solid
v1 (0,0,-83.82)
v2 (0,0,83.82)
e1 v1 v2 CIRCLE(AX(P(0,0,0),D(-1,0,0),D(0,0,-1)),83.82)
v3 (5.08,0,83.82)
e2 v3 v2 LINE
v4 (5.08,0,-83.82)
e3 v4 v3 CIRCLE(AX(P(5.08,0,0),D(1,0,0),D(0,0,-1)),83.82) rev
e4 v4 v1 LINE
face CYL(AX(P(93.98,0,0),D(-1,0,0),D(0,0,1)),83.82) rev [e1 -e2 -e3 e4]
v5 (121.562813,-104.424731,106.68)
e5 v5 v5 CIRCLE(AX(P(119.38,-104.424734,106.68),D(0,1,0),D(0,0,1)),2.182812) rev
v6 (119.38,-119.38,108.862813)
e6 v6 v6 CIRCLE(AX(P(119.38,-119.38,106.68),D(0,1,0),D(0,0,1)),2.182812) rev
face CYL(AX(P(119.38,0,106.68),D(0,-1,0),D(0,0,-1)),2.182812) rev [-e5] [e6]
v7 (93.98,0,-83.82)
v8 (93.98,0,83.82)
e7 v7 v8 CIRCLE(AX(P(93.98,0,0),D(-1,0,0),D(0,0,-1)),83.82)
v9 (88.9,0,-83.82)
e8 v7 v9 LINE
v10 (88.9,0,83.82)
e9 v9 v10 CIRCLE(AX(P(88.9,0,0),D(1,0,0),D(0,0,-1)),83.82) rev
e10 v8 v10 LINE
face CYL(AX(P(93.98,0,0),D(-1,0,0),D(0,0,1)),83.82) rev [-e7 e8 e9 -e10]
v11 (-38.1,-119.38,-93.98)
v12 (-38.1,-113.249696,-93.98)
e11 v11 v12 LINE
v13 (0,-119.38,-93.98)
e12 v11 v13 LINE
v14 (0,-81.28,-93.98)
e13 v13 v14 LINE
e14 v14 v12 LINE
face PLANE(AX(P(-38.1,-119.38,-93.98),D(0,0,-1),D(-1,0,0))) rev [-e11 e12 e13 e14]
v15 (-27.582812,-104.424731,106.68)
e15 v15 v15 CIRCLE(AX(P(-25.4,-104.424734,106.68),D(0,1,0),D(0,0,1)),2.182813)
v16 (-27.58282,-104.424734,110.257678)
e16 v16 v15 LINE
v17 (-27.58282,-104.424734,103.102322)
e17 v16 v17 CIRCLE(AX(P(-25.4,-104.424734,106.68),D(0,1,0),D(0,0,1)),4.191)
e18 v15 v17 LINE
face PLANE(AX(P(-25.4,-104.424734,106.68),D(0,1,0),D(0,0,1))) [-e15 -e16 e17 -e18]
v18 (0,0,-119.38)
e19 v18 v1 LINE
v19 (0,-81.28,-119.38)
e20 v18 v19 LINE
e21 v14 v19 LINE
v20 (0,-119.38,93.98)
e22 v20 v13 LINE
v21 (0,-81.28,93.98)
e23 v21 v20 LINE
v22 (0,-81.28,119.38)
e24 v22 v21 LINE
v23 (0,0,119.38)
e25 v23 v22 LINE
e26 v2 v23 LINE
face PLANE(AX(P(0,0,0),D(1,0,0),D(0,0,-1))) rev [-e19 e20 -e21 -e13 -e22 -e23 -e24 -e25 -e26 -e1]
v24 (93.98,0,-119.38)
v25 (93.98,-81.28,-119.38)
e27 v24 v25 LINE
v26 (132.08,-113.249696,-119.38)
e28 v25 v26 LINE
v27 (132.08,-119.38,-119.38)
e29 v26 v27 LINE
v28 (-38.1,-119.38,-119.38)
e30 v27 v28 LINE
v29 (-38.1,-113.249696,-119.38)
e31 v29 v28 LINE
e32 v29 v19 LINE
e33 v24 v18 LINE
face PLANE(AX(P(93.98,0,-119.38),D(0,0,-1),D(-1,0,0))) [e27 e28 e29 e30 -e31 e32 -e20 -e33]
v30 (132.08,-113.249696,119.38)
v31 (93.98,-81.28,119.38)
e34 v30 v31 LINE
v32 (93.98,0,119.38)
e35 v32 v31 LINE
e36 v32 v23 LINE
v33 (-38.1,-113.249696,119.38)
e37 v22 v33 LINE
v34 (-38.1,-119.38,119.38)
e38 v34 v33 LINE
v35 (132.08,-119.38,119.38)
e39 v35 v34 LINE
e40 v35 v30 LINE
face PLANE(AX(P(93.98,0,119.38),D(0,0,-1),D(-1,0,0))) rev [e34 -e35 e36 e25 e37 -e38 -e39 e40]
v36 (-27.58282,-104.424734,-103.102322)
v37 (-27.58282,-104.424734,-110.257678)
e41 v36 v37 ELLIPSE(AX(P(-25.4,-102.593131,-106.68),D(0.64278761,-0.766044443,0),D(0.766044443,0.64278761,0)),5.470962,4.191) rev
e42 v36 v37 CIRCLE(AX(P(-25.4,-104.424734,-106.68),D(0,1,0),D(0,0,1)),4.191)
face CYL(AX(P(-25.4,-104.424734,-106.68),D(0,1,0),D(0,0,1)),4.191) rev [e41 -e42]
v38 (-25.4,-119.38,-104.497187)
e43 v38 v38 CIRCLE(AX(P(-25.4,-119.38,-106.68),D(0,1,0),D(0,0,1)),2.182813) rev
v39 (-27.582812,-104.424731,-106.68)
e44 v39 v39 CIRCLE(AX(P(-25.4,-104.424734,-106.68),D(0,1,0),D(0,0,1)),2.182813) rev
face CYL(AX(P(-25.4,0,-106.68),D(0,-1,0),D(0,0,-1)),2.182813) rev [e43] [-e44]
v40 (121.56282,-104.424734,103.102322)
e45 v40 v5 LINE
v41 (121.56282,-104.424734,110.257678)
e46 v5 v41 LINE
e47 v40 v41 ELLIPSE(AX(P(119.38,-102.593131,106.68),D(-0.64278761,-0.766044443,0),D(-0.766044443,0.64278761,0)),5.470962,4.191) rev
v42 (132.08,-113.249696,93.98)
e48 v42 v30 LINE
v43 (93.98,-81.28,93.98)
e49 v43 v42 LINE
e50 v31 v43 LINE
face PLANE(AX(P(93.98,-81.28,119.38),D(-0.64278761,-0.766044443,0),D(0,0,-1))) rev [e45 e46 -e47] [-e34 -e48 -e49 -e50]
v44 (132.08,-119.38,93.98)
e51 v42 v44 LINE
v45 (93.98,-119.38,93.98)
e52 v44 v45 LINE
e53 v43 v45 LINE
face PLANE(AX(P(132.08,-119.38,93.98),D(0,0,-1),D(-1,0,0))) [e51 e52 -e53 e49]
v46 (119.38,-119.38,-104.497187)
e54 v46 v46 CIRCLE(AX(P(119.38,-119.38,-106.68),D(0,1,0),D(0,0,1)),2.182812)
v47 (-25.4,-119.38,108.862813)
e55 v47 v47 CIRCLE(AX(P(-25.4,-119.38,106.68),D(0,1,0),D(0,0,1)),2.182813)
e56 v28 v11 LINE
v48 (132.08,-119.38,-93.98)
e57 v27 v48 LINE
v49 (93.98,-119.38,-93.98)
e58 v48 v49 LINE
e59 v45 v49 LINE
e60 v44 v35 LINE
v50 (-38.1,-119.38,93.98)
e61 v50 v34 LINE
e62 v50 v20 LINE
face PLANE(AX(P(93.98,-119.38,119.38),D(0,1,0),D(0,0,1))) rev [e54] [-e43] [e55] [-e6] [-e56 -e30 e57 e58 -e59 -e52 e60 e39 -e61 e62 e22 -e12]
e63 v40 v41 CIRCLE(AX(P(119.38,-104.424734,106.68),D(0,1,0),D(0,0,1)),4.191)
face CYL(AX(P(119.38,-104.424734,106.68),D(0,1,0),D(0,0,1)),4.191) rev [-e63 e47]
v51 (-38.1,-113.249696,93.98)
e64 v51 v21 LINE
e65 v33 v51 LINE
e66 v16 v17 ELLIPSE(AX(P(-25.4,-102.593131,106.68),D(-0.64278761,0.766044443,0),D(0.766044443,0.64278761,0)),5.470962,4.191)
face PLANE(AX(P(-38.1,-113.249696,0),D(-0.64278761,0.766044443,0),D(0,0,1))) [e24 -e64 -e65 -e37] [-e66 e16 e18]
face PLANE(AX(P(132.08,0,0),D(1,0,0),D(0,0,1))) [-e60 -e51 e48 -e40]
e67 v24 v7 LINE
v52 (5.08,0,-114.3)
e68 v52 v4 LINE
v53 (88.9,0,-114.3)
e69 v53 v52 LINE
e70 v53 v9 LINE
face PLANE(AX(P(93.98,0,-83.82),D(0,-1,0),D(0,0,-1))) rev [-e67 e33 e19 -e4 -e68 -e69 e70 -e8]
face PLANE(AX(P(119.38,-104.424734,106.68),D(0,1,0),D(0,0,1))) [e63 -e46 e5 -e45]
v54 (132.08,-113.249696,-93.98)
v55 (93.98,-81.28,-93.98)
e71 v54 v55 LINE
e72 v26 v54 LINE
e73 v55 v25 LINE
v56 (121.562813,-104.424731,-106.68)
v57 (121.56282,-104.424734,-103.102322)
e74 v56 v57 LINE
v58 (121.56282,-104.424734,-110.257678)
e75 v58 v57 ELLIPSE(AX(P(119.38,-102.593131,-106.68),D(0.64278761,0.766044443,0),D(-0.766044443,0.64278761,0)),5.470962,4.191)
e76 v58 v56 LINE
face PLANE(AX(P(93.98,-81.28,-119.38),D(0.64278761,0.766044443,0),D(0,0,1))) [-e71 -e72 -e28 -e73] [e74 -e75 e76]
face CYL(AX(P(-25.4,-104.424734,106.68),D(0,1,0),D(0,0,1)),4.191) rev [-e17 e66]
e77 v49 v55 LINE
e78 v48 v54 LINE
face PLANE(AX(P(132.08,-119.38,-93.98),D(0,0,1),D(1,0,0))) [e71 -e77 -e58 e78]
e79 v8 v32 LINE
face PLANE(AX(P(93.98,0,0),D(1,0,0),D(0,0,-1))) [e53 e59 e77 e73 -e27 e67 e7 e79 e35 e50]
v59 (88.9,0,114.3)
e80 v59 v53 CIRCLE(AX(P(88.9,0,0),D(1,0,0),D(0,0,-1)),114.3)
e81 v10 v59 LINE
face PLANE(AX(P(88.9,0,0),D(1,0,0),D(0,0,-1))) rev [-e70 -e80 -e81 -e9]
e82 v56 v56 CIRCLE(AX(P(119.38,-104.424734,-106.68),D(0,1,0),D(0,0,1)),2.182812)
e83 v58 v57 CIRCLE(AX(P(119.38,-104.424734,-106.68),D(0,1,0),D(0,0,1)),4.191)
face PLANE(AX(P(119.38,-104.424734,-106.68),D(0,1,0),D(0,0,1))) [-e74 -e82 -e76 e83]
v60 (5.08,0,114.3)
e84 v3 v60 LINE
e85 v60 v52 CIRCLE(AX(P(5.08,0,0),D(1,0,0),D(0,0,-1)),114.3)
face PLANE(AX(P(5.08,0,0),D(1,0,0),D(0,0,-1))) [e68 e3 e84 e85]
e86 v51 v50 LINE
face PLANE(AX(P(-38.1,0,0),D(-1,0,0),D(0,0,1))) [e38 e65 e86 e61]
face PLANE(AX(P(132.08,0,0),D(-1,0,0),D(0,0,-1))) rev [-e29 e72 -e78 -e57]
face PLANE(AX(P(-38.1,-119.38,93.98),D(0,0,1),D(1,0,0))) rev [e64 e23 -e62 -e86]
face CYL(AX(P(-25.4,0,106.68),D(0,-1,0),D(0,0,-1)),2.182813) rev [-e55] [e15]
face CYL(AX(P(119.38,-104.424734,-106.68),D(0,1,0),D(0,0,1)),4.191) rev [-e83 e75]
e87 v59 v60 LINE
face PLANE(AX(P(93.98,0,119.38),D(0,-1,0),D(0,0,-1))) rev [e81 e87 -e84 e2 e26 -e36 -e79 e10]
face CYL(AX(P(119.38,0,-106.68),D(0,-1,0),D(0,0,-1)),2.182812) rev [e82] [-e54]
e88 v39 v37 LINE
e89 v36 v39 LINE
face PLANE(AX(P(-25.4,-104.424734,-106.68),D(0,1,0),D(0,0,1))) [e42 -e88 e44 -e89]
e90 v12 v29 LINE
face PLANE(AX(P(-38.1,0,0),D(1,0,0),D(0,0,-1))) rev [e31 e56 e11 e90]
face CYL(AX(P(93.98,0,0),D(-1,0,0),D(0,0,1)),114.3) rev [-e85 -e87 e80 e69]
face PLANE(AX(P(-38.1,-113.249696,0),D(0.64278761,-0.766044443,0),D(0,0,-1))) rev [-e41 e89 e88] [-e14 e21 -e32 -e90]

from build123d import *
from OCP.BRepFilletAPI import BRepFilletAPI_MakeChamfer

# Parameters (mm, degrees)
BOSS_EXTRUDE1_DEPTH        = 93.98
SHELL2_T                   = -5.08
BOSS_EXTRUDE2_DEPTH        = 93.98
SKETCH9_W                  = 31.75
SKETCH9_H                  = 12.7
BOSS_EXTRUDE3_DEPTH        = 25.4
SKETCH8_R                  = 2.1828125
CUT_EXTRUDE2_DEPTH         = 210.869181158
SKETCH10_W                 = 25.4
SKETCH10_H                 = 38.1
BOSS_EXTRUDE4_DEPTH        = 38.1
CHAMFER1_SIZE              = 38.1
CHAMFER1_SIZE_2            = 31.969695948
CHAMFER1_OF_MIRROR3_SIZE   = 38.1
CHAMFER1_OF_MIRROR3_SIZE_2 = 31.969695948
SKETCH13_R                 = 2.1828125
CUT_EXTRUDE4_DEPTH         = 230.473221096
SKETCH15_W                 = 93.98
SKETCH15_H                 = 25.4
CUT_EXTRUDE5_DEPTH         = 230.473221096
CUT_EXTRUDE6_START         = 40.355266
SKETCH14_R                 = 4.191
CUT_EXTRUDE6_DEPTH         = 25.4


with BuildPart() as part:
    # Sketch1 → Boss-Extrude1 (new body)
    with BuildSketch(Plane(origin=(0, 0, 0), x_dir=(0, 0, -1), z_dir=(1, 0, 0))):
        with BuildLine():
            Line((-119.38, 0), (-83.82, 0))
            ThreePointArc((-83.82, 0), (0, -83.82), (83.82, 0))
            Line((83.82, 0), (119.38, 0))
            ThreePointArc((119.38, 0), (0, -119.38), (-119.38, 0))
        make_face()
    extrude(amount=BOSS_EXTRUDE1_DEPTH)

    # Shell2
    shell2_openings = [part.faces().sort_by_distance(p)[0] for p in [
        (46.99, 0, 101.6),
        (46.99, -83.82, 0),
        (46.99, 0, -101.6),
    ]]
    offset(amount=SHELL2_T, openings=shell2_openings, kind=Kind.INTERSECTION)

    # Sketch6 → Boss-Extrude2 (add)
    with BuildSketch(Plane(origin=(0, 0, 0), x_dir=(0, 0, -1), z_dir=(1, 0, 0))):
        with BuildLine():
            Line((-119.38, 0), (-119.38, -119.38))
            Line((-119.38, -119.38), (0, -119.38))
            ThreePointArc((0, -119.38), (-84.414407538, -84.414407538), (-119.38, 0))
        make_face()
    boss_extrude2 = extrude(amount=BOSS_EXTRUDE2_DEPTH)

    # Sketch9 → Boss-Extrude3 (add)
    with BuildSketch(Plane.XY.offset(119.38)):
        with Locations((15.875, -113.03)):
            Rectangle(SKETCH9_W, SKETCH9_H)
        with Locations((78.105, -113.03)):
            Rectangle(SKETCH9_W, SKETCH9_H)
    boss_extrude3 = extrude(amount=BOSS_EXTRUDE3_DEPTH)

    # Sketch8 → Cut-Extrude2 (cut, through all)
    with BuildSketch(Plane(origin=(0, 0, 0), x_dir=(1, 0, 0), z_dir=(0, 1, 0))):
        with Locations(Location((15.875, -132.08, 0), (0, 0, 270))):
            Circle(SKETCH8_R)
        with Locations(Location((78.74, -132.08, 0), (0, 0, 270))):
            Circle(SKETCH8_R)
    cut_extrude2 = extrude(amount=-CUT_EXTRUDE2_DEPTH, mode=Mode.SUBTRACT)

    # Mirror2: Boss-Extrude2, Boss-Extrude3, Cut-Extrude2 across plane
    add(boss_extrude2.mirror(Plane.XY))
    add(boss_extrude3.mirror(Plane.XY))
    add(cut_extrude2.mirror(Plane.XY), mode=Mode.SUBTRACT)

    # Sketch10 → Boss-Extrude4 (add)
    with BuildSketch(Plane.ZY):
        with Locations((-106.68, -100.33)):
            Rectangle(SKETCH10_W, SKETCH10_H)
        with Locations((106.68, -100.33)):
            Rectangle(SKETCH10_W, SKETCH10_H)
    boss_extrude4 = extrude(amount=BOSS_EXTRUDE4_DEPTH)

    # Chamfer1
    chamfer1_edges_1 = [part.edges().sort_by_distance(p)[0] for p in [
        (-38.1, -81.28, 106.68),
    ]]
    chamfer1_side_1 = [part.faces().sort_by_distance(p)[0] for p in [
        (-37.460606081, -81.28, 106.68),
    ]]
    chamfer1_edges_2 = [part.edges().sort_by_distance(p)[0] for p in [
        (-38.1, -81.28, -106.68),
    ]]
    chamfer1_side_2 = [part.faces().sort_by_distance(p)[0] for p in [
        (-37.460606081, -81.28, -106.68),
    ]]
    chamfer1 = BRepFilletAPI_MakeChamfer(part.part.solid().wrapped)
    for e in chamfer1_edges_1:
        chamfer1.Add(CHAMFER1_SIZE - 0.0001, CHAMFER1_SIZE_2 - 0.0001, e.wrapped, chamfer1_side_1[0].wrapped)
    for e in chamfer1_edges_2:
        chamfer1.Add(CHAMFER1_SIZE - 0.0001, CHAMFER1_SIZE_2 - 0.0001, e.wrapped, chamfer1_side_2[0].wrapped)
    add(Compound.cast(chamfer1.Shape()), mode=Mode.REPLACE)  # a hair under: the kernel refuses the full size

    # Mirror3: Boss-Extrude4 across plane
    add(boss_extrude4.mirror(Plane(origin=(46.99, 0, 0), x_dir=(0, 0, 1), z_dir=(1, 0, 0))))

    # Chamfer1 of Mirror3
    chamfer1_of_mirror3_edges_1 = [part.edges().sort_by_distance(p)[0] for p in [
        (132.08, -81.28, 106.68),
    ]]
    chamfer1_of_mirror3_side_1 = [part.faces().sort_by_distance(p)[0] for p in [
        (131.440606081, -81.28, 106.68),
    ]]
    chamfer1_of_mirror3_edges_2 = [part.edges().sort_by_distance(p)[0] for p in [
        (132.08, -81.28, -106.68),
    ]]
    chamfer1_of_mirror3_side_2 = [part.faces().sort_by_distance(p)[0] for p in [
        (131.440606081, -81.28, -106.68),
    ]]
    chamfer1_of_mirror3 = BRepFilletAPI_MakeChamfer(part.part.solid().wrapped)
    for e in chamfer1_of_mirror3_edges_1:
        chamfer1_of_mirror3.Add(CHAMFER1_OF_MIRROR3_SIZE - 0.0001, CHAMFER1_OF_MIRROR3_SIZE_2 - 0.0001, e.wrapped, chamfer1_of_mirror3_side_1[0].wrapped)
    for e in chamfer1_of_mirror3_edges_2:
        chamfer1_of_mirror3.Add(CHAMFER1_OF_MIRROR3_SIZE - 0.0001, CHAMFER1_OF_MIRROR3_SIZE_2 - 0.0001, e.wrapped, chamfer1_of_mirror3_side_2[0].wrapped)
    add(Compound.cast(chamfer1_of_mirror3.Shape()), mode=Mode.REPLACE)  # a hair under: the kernel refuses the full size

    # Sketch13 → Cut-Extrude4 (cut, through all)
    with BuildSketch(Plane(origin=(0, -119.38, 0), x_dir=(1, 0, 0), z_dir=(0, 1, 0))):
        with Locations(Location((-25.4, -106.68, 0), (0, 0, 180))):
            Circle(SKETCH13_R)
        with Locations((119.38, -106.68)):
            Circle(SKETCH13_R)
        with Locations((119.38, 106.68)):
            Circle(SKETCH13_R)
        with Locations(Location((-25.4, 106.68, 0), (0, 0, 180))):
            Circle(SKETCH13_R)
    extrude(amount=CUT_EXTRUDE4_DEPTH, mode=Mode.SUBTRACT)

    # Sketch15 → Cut-Extrude5 (cut, through all)
    with BuildSketch(Plane(origin=(0, -119.38, 0), x_dir=(1, 0, 0), z_dir=(0, 1, 0))):
        with Locations((46.99, -132.08)):
            Rectangle(SKETCH15_W, SKETCH15_H)
        with Locations((46.99, 132.08)):
            Rectangle(SKETCH15_W, SKETCH15_H)
    extrude(amount=CUT_EXTRUDE5_DEPTH, mode=Mode.SUBTRACT)

    # Sketch14 → Cut-Extrude6 (cut)
    with BuildSketch(Plane(origin=(0, -119.38, 0), x_dir=(1, 0, 0), z_dir=(0, 1, 0)).offset(CUT_EXTRUDE6_START)):
        with Locations((-25.4, -106.68)):
            Circle(SKETCH14_R)
        with Locations((119.38, -106.68)):
            Circle(SKETCH14_R)
        with Locations((119.38, 106.68)):
            Circle(SKETCH14_R)
        with Locations((-25.4, 106.68)):
            Circle(SKETCH14_R)
    extrude(amount=-CUT_EXTRUDE6_DEPTH, mode=Mode.SUBTRACT)


solid = part.part
